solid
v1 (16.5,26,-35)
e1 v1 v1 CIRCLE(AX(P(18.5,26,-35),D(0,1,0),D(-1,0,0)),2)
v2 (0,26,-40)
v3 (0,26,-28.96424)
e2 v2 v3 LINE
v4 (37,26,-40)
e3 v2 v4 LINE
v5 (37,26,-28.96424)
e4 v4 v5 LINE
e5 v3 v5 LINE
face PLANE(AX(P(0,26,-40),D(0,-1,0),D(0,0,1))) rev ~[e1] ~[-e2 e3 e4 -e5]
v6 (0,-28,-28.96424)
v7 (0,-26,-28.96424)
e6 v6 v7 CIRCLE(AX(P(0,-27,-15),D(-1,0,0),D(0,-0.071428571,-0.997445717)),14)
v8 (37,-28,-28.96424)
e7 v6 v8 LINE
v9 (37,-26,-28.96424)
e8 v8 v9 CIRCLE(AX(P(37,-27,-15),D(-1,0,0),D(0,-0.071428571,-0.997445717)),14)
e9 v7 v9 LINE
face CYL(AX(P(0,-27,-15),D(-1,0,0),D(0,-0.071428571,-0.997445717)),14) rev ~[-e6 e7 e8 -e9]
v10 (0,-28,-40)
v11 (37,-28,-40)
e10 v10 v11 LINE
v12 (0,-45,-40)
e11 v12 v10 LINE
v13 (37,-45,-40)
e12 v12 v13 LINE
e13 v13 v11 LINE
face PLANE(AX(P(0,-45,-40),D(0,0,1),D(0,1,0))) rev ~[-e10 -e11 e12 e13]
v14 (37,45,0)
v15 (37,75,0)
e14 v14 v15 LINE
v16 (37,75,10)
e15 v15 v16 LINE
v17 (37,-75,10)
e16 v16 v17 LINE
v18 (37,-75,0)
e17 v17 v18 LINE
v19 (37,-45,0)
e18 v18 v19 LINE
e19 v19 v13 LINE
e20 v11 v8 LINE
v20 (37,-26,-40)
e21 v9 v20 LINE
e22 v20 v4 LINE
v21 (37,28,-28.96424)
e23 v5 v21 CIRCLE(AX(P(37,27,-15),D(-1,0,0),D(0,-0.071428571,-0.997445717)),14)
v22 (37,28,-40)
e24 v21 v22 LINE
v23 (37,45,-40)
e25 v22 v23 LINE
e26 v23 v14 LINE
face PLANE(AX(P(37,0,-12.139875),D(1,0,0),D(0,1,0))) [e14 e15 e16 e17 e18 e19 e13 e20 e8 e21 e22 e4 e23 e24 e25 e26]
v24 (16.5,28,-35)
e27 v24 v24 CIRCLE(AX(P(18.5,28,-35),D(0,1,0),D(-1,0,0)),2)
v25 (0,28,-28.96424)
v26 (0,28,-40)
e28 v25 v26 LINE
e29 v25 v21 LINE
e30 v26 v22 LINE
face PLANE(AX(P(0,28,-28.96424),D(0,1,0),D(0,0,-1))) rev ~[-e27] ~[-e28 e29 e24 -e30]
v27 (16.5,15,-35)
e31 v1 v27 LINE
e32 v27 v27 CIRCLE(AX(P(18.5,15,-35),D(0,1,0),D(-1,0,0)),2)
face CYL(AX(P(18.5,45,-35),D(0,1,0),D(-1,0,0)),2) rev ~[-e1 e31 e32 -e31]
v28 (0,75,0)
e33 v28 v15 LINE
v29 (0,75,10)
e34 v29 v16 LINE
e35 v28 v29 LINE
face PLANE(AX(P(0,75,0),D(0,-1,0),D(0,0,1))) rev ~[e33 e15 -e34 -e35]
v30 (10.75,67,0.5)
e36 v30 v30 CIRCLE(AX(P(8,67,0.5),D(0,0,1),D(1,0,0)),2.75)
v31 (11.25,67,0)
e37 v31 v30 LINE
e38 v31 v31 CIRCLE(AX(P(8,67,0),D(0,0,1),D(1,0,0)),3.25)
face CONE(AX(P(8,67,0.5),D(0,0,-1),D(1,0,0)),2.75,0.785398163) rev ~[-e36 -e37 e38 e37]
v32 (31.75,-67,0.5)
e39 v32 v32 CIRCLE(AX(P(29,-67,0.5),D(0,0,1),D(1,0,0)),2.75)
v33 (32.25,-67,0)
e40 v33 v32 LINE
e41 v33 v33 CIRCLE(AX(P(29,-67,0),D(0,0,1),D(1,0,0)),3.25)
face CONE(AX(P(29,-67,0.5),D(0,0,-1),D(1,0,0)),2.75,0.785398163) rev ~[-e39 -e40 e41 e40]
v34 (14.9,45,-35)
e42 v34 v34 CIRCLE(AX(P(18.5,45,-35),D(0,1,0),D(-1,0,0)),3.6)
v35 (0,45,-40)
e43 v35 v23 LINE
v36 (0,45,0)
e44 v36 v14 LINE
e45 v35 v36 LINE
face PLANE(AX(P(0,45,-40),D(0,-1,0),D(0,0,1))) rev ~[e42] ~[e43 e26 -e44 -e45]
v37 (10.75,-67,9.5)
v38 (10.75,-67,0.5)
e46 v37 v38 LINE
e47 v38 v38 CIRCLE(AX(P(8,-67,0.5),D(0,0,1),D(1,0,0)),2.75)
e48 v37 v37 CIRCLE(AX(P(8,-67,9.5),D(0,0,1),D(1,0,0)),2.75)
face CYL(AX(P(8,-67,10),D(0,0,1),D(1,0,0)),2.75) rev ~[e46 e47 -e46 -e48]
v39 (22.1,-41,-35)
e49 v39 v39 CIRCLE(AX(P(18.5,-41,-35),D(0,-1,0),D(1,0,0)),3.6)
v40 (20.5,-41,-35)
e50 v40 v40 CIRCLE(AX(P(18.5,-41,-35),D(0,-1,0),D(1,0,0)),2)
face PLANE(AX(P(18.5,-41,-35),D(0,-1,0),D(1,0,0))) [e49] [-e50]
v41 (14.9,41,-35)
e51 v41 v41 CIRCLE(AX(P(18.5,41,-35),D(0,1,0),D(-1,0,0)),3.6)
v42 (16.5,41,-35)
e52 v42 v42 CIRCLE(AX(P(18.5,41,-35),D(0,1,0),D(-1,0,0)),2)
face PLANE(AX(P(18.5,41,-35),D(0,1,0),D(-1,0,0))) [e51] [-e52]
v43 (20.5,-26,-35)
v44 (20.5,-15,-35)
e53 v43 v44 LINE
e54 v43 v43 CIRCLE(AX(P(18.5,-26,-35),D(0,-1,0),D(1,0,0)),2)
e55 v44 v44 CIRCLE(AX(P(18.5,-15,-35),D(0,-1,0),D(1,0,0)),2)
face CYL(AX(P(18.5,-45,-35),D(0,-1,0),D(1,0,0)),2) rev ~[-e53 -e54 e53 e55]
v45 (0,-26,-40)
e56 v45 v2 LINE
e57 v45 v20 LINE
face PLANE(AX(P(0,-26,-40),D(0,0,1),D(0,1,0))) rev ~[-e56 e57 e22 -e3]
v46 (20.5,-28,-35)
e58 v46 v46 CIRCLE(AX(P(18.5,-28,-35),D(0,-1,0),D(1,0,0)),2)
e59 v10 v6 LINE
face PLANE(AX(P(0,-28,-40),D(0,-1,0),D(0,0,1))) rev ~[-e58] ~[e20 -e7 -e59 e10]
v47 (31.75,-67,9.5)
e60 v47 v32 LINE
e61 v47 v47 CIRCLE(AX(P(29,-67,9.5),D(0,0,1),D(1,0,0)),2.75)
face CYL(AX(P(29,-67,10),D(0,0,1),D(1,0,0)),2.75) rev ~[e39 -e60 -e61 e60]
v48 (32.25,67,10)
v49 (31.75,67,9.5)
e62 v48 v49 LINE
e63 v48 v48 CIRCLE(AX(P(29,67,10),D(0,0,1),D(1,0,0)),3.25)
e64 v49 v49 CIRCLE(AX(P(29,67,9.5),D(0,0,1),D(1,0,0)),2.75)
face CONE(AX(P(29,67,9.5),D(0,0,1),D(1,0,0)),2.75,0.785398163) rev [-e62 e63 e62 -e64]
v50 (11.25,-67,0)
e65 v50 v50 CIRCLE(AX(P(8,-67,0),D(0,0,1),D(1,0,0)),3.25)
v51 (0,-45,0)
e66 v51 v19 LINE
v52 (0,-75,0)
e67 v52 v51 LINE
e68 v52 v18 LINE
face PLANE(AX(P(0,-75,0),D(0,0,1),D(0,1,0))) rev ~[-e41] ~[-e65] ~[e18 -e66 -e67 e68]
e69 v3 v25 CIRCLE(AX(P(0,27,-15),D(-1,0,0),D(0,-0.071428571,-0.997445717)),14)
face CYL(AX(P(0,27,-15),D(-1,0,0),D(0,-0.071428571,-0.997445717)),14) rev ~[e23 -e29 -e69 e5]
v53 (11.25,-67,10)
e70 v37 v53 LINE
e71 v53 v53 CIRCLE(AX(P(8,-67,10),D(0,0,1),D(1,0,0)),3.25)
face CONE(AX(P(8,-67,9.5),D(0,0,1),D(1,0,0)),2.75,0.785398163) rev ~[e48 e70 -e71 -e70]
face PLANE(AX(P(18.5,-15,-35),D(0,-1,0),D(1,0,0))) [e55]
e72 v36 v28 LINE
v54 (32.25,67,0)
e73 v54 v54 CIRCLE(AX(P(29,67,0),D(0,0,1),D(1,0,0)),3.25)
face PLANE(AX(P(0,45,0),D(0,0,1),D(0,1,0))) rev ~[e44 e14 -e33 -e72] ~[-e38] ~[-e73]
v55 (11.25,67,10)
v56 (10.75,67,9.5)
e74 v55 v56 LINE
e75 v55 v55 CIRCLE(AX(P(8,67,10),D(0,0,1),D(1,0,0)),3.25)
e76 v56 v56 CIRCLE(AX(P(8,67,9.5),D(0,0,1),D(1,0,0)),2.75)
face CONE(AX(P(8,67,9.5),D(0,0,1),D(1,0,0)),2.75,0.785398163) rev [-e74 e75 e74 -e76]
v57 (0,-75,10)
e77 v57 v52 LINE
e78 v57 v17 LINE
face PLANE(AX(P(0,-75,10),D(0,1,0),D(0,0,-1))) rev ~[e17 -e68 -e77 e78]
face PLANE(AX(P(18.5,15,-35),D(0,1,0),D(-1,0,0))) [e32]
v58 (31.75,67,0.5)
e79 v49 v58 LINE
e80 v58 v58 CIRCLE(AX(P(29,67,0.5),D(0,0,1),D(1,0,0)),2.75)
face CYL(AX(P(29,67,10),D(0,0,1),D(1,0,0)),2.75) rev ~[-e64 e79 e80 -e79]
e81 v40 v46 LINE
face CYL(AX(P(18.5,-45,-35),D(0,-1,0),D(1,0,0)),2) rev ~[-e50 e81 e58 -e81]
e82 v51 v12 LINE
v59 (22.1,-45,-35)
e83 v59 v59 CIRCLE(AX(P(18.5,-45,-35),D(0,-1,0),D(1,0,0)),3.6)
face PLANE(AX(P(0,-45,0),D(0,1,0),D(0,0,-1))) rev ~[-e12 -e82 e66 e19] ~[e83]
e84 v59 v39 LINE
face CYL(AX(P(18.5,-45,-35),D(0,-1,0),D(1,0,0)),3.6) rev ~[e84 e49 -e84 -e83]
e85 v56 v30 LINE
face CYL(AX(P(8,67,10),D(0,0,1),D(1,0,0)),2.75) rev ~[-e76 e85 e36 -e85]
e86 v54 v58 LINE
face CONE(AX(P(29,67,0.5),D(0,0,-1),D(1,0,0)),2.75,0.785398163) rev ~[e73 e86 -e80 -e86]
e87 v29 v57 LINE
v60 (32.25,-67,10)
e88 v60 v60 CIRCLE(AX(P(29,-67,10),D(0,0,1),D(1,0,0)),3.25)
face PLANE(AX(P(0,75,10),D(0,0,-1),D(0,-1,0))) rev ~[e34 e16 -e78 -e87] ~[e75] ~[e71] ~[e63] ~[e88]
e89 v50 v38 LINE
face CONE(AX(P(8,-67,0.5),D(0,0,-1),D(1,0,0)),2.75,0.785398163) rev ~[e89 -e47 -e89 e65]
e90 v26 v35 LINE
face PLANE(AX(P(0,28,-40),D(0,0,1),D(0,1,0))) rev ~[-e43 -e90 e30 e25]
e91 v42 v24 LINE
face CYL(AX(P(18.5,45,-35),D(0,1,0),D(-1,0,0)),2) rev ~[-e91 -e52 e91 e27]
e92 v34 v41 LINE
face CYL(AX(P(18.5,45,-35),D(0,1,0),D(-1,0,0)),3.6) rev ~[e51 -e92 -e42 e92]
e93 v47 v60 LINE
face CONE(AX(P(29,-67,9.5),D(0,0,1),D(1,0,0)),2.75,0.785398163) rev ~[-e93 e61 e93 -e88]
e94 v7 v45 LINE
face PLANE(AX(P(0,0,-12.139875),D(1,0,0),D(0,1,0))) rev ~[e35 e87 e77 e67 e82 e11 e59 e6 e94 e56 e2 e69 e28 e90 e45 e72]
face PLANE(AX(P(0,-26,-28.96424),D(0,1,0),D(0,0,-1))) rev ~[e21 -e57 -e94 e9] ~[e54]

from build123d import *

# Parameters (mm, degrees)
F1_DEPTH  = 37
F2_R      = 2
F3_DEPTH  = 30
F4_R      = 3.6
F5_DEPTH  = 4
F6_R      = 2
F7_DEPTH  = 30
F8_R      = 3.6
F9_DEPTH  = 4
F10_R     = 2.75
F11_DEPTH = 50.001
F12_SIZE  = 0.5


with BuildPart() as f1:
    # F0 (on Right) → F1 (new body)
    with BuildSketch(Plane.YZ):
        with BuildLine():
            Line((-45, 0), (-45, -40))
            Line((-45, -40), (-28, -40))
            Line((-28, -40), (-28, -28.9642400438))
            ThreePointArc((-28, -28.9642400438), (-27, -1), (-26, -28.9642400438))
            Line((-26, -28.9642400438), (-26, -40))
            Line((-26, -40), (26, -40))
            Line((26, -40), (26, -28.9642400438))
            ThreePointArc((26, -28.9642400438), (27, -1), (28, -28.9642400438))
            Line((28, -28.9642400438), (28, -40))
            Line((28, -40), (45, -40))
            Line((45, -40), (45, 0))
            Line((45, 0), (75, 0))
            Line((75, 0), (75, 10))
            Line((75, 10), (-75, 10))
            Line((-75, 10), (-75, 0))
            Line((-75, 0), (-45, 0))
        make_face()
    extrude(amount=F1_DEPTH)

    # F2 (on face) → F3 (cut)
    with BuildSketch(Plane.XZ.offset(45)):
        with Locations((18.5, -35)):
            Circle(F2_R)
    extrude(amount=-F3_DEPTH, mode=Mode.SUBTRACT)

    # F4 (on face) → F5 (cut)
    with BuildSketch(Plane.XZ.offset(45)):
        with Locations((18.5, -35)):
            Circle(F4_R)
    extrude(amount=-F5_DEPTH, mode=Mode.SUBTRACT)

    # F6 (on face) → F7 (cut)
    with BuildSketch(Plane(origin=(0, 45, 0), x_dir=(-1, 0, 0), z_dir=(0, 1, 0))):
        with Locations((-18.5, -35)):
            Circle(F6_R)
    extrude(amount=-F7_DEPTH, mode=Mode.SUBTRACT)

    # F8 (on face) → F9 (cut)
    with BuildSketch(Plane(origin=(0, 45, 0), x_dir=(-1, 0, 0), z_dir=(0, 1, 0))):
        with Locations((-18.5, -35)):
            Circle(F8_R)
    extrude(amount=-F9_DEPTH, mode=Mode.SUBTRACT)

    # F10 (on face) → F11 (cut, through all)
    with BuildSketch(Plane.XY.offset(10)):
        with Locations((29, 67)):
            Circle(F10_R)
        with Locations((8, 67)):
            Circle(F10_R)
        with Locations((8, -67)):
            Circle(F10_R)
        with Locations((29, -67)):
            Circle(F10_R)
    extrude(amount=-F11_DEPTH, mode=Mode.SUBTRACT)

    # F12
    f12_edges = [f1.edges().sort_by_distance(p)[0] for p in [
        (5.25, 67, 10),
        (10.75, 67, 5),
        (5.25, 67, 0),
        (26.25, 67, 10),
        (31.75, 67, 5),
        (26.25, 67, 0),
        (5.25, -67, 10),
        (10.75, -67, 5),
        (5.25, -67, 0),
        (26.25, -67, 10),
        (31.75, -67, 5),
        (26.25, -67, 0),
    ]]
    chamfer(f12_edges, length=F12_SIZE)


solid = f1.part
